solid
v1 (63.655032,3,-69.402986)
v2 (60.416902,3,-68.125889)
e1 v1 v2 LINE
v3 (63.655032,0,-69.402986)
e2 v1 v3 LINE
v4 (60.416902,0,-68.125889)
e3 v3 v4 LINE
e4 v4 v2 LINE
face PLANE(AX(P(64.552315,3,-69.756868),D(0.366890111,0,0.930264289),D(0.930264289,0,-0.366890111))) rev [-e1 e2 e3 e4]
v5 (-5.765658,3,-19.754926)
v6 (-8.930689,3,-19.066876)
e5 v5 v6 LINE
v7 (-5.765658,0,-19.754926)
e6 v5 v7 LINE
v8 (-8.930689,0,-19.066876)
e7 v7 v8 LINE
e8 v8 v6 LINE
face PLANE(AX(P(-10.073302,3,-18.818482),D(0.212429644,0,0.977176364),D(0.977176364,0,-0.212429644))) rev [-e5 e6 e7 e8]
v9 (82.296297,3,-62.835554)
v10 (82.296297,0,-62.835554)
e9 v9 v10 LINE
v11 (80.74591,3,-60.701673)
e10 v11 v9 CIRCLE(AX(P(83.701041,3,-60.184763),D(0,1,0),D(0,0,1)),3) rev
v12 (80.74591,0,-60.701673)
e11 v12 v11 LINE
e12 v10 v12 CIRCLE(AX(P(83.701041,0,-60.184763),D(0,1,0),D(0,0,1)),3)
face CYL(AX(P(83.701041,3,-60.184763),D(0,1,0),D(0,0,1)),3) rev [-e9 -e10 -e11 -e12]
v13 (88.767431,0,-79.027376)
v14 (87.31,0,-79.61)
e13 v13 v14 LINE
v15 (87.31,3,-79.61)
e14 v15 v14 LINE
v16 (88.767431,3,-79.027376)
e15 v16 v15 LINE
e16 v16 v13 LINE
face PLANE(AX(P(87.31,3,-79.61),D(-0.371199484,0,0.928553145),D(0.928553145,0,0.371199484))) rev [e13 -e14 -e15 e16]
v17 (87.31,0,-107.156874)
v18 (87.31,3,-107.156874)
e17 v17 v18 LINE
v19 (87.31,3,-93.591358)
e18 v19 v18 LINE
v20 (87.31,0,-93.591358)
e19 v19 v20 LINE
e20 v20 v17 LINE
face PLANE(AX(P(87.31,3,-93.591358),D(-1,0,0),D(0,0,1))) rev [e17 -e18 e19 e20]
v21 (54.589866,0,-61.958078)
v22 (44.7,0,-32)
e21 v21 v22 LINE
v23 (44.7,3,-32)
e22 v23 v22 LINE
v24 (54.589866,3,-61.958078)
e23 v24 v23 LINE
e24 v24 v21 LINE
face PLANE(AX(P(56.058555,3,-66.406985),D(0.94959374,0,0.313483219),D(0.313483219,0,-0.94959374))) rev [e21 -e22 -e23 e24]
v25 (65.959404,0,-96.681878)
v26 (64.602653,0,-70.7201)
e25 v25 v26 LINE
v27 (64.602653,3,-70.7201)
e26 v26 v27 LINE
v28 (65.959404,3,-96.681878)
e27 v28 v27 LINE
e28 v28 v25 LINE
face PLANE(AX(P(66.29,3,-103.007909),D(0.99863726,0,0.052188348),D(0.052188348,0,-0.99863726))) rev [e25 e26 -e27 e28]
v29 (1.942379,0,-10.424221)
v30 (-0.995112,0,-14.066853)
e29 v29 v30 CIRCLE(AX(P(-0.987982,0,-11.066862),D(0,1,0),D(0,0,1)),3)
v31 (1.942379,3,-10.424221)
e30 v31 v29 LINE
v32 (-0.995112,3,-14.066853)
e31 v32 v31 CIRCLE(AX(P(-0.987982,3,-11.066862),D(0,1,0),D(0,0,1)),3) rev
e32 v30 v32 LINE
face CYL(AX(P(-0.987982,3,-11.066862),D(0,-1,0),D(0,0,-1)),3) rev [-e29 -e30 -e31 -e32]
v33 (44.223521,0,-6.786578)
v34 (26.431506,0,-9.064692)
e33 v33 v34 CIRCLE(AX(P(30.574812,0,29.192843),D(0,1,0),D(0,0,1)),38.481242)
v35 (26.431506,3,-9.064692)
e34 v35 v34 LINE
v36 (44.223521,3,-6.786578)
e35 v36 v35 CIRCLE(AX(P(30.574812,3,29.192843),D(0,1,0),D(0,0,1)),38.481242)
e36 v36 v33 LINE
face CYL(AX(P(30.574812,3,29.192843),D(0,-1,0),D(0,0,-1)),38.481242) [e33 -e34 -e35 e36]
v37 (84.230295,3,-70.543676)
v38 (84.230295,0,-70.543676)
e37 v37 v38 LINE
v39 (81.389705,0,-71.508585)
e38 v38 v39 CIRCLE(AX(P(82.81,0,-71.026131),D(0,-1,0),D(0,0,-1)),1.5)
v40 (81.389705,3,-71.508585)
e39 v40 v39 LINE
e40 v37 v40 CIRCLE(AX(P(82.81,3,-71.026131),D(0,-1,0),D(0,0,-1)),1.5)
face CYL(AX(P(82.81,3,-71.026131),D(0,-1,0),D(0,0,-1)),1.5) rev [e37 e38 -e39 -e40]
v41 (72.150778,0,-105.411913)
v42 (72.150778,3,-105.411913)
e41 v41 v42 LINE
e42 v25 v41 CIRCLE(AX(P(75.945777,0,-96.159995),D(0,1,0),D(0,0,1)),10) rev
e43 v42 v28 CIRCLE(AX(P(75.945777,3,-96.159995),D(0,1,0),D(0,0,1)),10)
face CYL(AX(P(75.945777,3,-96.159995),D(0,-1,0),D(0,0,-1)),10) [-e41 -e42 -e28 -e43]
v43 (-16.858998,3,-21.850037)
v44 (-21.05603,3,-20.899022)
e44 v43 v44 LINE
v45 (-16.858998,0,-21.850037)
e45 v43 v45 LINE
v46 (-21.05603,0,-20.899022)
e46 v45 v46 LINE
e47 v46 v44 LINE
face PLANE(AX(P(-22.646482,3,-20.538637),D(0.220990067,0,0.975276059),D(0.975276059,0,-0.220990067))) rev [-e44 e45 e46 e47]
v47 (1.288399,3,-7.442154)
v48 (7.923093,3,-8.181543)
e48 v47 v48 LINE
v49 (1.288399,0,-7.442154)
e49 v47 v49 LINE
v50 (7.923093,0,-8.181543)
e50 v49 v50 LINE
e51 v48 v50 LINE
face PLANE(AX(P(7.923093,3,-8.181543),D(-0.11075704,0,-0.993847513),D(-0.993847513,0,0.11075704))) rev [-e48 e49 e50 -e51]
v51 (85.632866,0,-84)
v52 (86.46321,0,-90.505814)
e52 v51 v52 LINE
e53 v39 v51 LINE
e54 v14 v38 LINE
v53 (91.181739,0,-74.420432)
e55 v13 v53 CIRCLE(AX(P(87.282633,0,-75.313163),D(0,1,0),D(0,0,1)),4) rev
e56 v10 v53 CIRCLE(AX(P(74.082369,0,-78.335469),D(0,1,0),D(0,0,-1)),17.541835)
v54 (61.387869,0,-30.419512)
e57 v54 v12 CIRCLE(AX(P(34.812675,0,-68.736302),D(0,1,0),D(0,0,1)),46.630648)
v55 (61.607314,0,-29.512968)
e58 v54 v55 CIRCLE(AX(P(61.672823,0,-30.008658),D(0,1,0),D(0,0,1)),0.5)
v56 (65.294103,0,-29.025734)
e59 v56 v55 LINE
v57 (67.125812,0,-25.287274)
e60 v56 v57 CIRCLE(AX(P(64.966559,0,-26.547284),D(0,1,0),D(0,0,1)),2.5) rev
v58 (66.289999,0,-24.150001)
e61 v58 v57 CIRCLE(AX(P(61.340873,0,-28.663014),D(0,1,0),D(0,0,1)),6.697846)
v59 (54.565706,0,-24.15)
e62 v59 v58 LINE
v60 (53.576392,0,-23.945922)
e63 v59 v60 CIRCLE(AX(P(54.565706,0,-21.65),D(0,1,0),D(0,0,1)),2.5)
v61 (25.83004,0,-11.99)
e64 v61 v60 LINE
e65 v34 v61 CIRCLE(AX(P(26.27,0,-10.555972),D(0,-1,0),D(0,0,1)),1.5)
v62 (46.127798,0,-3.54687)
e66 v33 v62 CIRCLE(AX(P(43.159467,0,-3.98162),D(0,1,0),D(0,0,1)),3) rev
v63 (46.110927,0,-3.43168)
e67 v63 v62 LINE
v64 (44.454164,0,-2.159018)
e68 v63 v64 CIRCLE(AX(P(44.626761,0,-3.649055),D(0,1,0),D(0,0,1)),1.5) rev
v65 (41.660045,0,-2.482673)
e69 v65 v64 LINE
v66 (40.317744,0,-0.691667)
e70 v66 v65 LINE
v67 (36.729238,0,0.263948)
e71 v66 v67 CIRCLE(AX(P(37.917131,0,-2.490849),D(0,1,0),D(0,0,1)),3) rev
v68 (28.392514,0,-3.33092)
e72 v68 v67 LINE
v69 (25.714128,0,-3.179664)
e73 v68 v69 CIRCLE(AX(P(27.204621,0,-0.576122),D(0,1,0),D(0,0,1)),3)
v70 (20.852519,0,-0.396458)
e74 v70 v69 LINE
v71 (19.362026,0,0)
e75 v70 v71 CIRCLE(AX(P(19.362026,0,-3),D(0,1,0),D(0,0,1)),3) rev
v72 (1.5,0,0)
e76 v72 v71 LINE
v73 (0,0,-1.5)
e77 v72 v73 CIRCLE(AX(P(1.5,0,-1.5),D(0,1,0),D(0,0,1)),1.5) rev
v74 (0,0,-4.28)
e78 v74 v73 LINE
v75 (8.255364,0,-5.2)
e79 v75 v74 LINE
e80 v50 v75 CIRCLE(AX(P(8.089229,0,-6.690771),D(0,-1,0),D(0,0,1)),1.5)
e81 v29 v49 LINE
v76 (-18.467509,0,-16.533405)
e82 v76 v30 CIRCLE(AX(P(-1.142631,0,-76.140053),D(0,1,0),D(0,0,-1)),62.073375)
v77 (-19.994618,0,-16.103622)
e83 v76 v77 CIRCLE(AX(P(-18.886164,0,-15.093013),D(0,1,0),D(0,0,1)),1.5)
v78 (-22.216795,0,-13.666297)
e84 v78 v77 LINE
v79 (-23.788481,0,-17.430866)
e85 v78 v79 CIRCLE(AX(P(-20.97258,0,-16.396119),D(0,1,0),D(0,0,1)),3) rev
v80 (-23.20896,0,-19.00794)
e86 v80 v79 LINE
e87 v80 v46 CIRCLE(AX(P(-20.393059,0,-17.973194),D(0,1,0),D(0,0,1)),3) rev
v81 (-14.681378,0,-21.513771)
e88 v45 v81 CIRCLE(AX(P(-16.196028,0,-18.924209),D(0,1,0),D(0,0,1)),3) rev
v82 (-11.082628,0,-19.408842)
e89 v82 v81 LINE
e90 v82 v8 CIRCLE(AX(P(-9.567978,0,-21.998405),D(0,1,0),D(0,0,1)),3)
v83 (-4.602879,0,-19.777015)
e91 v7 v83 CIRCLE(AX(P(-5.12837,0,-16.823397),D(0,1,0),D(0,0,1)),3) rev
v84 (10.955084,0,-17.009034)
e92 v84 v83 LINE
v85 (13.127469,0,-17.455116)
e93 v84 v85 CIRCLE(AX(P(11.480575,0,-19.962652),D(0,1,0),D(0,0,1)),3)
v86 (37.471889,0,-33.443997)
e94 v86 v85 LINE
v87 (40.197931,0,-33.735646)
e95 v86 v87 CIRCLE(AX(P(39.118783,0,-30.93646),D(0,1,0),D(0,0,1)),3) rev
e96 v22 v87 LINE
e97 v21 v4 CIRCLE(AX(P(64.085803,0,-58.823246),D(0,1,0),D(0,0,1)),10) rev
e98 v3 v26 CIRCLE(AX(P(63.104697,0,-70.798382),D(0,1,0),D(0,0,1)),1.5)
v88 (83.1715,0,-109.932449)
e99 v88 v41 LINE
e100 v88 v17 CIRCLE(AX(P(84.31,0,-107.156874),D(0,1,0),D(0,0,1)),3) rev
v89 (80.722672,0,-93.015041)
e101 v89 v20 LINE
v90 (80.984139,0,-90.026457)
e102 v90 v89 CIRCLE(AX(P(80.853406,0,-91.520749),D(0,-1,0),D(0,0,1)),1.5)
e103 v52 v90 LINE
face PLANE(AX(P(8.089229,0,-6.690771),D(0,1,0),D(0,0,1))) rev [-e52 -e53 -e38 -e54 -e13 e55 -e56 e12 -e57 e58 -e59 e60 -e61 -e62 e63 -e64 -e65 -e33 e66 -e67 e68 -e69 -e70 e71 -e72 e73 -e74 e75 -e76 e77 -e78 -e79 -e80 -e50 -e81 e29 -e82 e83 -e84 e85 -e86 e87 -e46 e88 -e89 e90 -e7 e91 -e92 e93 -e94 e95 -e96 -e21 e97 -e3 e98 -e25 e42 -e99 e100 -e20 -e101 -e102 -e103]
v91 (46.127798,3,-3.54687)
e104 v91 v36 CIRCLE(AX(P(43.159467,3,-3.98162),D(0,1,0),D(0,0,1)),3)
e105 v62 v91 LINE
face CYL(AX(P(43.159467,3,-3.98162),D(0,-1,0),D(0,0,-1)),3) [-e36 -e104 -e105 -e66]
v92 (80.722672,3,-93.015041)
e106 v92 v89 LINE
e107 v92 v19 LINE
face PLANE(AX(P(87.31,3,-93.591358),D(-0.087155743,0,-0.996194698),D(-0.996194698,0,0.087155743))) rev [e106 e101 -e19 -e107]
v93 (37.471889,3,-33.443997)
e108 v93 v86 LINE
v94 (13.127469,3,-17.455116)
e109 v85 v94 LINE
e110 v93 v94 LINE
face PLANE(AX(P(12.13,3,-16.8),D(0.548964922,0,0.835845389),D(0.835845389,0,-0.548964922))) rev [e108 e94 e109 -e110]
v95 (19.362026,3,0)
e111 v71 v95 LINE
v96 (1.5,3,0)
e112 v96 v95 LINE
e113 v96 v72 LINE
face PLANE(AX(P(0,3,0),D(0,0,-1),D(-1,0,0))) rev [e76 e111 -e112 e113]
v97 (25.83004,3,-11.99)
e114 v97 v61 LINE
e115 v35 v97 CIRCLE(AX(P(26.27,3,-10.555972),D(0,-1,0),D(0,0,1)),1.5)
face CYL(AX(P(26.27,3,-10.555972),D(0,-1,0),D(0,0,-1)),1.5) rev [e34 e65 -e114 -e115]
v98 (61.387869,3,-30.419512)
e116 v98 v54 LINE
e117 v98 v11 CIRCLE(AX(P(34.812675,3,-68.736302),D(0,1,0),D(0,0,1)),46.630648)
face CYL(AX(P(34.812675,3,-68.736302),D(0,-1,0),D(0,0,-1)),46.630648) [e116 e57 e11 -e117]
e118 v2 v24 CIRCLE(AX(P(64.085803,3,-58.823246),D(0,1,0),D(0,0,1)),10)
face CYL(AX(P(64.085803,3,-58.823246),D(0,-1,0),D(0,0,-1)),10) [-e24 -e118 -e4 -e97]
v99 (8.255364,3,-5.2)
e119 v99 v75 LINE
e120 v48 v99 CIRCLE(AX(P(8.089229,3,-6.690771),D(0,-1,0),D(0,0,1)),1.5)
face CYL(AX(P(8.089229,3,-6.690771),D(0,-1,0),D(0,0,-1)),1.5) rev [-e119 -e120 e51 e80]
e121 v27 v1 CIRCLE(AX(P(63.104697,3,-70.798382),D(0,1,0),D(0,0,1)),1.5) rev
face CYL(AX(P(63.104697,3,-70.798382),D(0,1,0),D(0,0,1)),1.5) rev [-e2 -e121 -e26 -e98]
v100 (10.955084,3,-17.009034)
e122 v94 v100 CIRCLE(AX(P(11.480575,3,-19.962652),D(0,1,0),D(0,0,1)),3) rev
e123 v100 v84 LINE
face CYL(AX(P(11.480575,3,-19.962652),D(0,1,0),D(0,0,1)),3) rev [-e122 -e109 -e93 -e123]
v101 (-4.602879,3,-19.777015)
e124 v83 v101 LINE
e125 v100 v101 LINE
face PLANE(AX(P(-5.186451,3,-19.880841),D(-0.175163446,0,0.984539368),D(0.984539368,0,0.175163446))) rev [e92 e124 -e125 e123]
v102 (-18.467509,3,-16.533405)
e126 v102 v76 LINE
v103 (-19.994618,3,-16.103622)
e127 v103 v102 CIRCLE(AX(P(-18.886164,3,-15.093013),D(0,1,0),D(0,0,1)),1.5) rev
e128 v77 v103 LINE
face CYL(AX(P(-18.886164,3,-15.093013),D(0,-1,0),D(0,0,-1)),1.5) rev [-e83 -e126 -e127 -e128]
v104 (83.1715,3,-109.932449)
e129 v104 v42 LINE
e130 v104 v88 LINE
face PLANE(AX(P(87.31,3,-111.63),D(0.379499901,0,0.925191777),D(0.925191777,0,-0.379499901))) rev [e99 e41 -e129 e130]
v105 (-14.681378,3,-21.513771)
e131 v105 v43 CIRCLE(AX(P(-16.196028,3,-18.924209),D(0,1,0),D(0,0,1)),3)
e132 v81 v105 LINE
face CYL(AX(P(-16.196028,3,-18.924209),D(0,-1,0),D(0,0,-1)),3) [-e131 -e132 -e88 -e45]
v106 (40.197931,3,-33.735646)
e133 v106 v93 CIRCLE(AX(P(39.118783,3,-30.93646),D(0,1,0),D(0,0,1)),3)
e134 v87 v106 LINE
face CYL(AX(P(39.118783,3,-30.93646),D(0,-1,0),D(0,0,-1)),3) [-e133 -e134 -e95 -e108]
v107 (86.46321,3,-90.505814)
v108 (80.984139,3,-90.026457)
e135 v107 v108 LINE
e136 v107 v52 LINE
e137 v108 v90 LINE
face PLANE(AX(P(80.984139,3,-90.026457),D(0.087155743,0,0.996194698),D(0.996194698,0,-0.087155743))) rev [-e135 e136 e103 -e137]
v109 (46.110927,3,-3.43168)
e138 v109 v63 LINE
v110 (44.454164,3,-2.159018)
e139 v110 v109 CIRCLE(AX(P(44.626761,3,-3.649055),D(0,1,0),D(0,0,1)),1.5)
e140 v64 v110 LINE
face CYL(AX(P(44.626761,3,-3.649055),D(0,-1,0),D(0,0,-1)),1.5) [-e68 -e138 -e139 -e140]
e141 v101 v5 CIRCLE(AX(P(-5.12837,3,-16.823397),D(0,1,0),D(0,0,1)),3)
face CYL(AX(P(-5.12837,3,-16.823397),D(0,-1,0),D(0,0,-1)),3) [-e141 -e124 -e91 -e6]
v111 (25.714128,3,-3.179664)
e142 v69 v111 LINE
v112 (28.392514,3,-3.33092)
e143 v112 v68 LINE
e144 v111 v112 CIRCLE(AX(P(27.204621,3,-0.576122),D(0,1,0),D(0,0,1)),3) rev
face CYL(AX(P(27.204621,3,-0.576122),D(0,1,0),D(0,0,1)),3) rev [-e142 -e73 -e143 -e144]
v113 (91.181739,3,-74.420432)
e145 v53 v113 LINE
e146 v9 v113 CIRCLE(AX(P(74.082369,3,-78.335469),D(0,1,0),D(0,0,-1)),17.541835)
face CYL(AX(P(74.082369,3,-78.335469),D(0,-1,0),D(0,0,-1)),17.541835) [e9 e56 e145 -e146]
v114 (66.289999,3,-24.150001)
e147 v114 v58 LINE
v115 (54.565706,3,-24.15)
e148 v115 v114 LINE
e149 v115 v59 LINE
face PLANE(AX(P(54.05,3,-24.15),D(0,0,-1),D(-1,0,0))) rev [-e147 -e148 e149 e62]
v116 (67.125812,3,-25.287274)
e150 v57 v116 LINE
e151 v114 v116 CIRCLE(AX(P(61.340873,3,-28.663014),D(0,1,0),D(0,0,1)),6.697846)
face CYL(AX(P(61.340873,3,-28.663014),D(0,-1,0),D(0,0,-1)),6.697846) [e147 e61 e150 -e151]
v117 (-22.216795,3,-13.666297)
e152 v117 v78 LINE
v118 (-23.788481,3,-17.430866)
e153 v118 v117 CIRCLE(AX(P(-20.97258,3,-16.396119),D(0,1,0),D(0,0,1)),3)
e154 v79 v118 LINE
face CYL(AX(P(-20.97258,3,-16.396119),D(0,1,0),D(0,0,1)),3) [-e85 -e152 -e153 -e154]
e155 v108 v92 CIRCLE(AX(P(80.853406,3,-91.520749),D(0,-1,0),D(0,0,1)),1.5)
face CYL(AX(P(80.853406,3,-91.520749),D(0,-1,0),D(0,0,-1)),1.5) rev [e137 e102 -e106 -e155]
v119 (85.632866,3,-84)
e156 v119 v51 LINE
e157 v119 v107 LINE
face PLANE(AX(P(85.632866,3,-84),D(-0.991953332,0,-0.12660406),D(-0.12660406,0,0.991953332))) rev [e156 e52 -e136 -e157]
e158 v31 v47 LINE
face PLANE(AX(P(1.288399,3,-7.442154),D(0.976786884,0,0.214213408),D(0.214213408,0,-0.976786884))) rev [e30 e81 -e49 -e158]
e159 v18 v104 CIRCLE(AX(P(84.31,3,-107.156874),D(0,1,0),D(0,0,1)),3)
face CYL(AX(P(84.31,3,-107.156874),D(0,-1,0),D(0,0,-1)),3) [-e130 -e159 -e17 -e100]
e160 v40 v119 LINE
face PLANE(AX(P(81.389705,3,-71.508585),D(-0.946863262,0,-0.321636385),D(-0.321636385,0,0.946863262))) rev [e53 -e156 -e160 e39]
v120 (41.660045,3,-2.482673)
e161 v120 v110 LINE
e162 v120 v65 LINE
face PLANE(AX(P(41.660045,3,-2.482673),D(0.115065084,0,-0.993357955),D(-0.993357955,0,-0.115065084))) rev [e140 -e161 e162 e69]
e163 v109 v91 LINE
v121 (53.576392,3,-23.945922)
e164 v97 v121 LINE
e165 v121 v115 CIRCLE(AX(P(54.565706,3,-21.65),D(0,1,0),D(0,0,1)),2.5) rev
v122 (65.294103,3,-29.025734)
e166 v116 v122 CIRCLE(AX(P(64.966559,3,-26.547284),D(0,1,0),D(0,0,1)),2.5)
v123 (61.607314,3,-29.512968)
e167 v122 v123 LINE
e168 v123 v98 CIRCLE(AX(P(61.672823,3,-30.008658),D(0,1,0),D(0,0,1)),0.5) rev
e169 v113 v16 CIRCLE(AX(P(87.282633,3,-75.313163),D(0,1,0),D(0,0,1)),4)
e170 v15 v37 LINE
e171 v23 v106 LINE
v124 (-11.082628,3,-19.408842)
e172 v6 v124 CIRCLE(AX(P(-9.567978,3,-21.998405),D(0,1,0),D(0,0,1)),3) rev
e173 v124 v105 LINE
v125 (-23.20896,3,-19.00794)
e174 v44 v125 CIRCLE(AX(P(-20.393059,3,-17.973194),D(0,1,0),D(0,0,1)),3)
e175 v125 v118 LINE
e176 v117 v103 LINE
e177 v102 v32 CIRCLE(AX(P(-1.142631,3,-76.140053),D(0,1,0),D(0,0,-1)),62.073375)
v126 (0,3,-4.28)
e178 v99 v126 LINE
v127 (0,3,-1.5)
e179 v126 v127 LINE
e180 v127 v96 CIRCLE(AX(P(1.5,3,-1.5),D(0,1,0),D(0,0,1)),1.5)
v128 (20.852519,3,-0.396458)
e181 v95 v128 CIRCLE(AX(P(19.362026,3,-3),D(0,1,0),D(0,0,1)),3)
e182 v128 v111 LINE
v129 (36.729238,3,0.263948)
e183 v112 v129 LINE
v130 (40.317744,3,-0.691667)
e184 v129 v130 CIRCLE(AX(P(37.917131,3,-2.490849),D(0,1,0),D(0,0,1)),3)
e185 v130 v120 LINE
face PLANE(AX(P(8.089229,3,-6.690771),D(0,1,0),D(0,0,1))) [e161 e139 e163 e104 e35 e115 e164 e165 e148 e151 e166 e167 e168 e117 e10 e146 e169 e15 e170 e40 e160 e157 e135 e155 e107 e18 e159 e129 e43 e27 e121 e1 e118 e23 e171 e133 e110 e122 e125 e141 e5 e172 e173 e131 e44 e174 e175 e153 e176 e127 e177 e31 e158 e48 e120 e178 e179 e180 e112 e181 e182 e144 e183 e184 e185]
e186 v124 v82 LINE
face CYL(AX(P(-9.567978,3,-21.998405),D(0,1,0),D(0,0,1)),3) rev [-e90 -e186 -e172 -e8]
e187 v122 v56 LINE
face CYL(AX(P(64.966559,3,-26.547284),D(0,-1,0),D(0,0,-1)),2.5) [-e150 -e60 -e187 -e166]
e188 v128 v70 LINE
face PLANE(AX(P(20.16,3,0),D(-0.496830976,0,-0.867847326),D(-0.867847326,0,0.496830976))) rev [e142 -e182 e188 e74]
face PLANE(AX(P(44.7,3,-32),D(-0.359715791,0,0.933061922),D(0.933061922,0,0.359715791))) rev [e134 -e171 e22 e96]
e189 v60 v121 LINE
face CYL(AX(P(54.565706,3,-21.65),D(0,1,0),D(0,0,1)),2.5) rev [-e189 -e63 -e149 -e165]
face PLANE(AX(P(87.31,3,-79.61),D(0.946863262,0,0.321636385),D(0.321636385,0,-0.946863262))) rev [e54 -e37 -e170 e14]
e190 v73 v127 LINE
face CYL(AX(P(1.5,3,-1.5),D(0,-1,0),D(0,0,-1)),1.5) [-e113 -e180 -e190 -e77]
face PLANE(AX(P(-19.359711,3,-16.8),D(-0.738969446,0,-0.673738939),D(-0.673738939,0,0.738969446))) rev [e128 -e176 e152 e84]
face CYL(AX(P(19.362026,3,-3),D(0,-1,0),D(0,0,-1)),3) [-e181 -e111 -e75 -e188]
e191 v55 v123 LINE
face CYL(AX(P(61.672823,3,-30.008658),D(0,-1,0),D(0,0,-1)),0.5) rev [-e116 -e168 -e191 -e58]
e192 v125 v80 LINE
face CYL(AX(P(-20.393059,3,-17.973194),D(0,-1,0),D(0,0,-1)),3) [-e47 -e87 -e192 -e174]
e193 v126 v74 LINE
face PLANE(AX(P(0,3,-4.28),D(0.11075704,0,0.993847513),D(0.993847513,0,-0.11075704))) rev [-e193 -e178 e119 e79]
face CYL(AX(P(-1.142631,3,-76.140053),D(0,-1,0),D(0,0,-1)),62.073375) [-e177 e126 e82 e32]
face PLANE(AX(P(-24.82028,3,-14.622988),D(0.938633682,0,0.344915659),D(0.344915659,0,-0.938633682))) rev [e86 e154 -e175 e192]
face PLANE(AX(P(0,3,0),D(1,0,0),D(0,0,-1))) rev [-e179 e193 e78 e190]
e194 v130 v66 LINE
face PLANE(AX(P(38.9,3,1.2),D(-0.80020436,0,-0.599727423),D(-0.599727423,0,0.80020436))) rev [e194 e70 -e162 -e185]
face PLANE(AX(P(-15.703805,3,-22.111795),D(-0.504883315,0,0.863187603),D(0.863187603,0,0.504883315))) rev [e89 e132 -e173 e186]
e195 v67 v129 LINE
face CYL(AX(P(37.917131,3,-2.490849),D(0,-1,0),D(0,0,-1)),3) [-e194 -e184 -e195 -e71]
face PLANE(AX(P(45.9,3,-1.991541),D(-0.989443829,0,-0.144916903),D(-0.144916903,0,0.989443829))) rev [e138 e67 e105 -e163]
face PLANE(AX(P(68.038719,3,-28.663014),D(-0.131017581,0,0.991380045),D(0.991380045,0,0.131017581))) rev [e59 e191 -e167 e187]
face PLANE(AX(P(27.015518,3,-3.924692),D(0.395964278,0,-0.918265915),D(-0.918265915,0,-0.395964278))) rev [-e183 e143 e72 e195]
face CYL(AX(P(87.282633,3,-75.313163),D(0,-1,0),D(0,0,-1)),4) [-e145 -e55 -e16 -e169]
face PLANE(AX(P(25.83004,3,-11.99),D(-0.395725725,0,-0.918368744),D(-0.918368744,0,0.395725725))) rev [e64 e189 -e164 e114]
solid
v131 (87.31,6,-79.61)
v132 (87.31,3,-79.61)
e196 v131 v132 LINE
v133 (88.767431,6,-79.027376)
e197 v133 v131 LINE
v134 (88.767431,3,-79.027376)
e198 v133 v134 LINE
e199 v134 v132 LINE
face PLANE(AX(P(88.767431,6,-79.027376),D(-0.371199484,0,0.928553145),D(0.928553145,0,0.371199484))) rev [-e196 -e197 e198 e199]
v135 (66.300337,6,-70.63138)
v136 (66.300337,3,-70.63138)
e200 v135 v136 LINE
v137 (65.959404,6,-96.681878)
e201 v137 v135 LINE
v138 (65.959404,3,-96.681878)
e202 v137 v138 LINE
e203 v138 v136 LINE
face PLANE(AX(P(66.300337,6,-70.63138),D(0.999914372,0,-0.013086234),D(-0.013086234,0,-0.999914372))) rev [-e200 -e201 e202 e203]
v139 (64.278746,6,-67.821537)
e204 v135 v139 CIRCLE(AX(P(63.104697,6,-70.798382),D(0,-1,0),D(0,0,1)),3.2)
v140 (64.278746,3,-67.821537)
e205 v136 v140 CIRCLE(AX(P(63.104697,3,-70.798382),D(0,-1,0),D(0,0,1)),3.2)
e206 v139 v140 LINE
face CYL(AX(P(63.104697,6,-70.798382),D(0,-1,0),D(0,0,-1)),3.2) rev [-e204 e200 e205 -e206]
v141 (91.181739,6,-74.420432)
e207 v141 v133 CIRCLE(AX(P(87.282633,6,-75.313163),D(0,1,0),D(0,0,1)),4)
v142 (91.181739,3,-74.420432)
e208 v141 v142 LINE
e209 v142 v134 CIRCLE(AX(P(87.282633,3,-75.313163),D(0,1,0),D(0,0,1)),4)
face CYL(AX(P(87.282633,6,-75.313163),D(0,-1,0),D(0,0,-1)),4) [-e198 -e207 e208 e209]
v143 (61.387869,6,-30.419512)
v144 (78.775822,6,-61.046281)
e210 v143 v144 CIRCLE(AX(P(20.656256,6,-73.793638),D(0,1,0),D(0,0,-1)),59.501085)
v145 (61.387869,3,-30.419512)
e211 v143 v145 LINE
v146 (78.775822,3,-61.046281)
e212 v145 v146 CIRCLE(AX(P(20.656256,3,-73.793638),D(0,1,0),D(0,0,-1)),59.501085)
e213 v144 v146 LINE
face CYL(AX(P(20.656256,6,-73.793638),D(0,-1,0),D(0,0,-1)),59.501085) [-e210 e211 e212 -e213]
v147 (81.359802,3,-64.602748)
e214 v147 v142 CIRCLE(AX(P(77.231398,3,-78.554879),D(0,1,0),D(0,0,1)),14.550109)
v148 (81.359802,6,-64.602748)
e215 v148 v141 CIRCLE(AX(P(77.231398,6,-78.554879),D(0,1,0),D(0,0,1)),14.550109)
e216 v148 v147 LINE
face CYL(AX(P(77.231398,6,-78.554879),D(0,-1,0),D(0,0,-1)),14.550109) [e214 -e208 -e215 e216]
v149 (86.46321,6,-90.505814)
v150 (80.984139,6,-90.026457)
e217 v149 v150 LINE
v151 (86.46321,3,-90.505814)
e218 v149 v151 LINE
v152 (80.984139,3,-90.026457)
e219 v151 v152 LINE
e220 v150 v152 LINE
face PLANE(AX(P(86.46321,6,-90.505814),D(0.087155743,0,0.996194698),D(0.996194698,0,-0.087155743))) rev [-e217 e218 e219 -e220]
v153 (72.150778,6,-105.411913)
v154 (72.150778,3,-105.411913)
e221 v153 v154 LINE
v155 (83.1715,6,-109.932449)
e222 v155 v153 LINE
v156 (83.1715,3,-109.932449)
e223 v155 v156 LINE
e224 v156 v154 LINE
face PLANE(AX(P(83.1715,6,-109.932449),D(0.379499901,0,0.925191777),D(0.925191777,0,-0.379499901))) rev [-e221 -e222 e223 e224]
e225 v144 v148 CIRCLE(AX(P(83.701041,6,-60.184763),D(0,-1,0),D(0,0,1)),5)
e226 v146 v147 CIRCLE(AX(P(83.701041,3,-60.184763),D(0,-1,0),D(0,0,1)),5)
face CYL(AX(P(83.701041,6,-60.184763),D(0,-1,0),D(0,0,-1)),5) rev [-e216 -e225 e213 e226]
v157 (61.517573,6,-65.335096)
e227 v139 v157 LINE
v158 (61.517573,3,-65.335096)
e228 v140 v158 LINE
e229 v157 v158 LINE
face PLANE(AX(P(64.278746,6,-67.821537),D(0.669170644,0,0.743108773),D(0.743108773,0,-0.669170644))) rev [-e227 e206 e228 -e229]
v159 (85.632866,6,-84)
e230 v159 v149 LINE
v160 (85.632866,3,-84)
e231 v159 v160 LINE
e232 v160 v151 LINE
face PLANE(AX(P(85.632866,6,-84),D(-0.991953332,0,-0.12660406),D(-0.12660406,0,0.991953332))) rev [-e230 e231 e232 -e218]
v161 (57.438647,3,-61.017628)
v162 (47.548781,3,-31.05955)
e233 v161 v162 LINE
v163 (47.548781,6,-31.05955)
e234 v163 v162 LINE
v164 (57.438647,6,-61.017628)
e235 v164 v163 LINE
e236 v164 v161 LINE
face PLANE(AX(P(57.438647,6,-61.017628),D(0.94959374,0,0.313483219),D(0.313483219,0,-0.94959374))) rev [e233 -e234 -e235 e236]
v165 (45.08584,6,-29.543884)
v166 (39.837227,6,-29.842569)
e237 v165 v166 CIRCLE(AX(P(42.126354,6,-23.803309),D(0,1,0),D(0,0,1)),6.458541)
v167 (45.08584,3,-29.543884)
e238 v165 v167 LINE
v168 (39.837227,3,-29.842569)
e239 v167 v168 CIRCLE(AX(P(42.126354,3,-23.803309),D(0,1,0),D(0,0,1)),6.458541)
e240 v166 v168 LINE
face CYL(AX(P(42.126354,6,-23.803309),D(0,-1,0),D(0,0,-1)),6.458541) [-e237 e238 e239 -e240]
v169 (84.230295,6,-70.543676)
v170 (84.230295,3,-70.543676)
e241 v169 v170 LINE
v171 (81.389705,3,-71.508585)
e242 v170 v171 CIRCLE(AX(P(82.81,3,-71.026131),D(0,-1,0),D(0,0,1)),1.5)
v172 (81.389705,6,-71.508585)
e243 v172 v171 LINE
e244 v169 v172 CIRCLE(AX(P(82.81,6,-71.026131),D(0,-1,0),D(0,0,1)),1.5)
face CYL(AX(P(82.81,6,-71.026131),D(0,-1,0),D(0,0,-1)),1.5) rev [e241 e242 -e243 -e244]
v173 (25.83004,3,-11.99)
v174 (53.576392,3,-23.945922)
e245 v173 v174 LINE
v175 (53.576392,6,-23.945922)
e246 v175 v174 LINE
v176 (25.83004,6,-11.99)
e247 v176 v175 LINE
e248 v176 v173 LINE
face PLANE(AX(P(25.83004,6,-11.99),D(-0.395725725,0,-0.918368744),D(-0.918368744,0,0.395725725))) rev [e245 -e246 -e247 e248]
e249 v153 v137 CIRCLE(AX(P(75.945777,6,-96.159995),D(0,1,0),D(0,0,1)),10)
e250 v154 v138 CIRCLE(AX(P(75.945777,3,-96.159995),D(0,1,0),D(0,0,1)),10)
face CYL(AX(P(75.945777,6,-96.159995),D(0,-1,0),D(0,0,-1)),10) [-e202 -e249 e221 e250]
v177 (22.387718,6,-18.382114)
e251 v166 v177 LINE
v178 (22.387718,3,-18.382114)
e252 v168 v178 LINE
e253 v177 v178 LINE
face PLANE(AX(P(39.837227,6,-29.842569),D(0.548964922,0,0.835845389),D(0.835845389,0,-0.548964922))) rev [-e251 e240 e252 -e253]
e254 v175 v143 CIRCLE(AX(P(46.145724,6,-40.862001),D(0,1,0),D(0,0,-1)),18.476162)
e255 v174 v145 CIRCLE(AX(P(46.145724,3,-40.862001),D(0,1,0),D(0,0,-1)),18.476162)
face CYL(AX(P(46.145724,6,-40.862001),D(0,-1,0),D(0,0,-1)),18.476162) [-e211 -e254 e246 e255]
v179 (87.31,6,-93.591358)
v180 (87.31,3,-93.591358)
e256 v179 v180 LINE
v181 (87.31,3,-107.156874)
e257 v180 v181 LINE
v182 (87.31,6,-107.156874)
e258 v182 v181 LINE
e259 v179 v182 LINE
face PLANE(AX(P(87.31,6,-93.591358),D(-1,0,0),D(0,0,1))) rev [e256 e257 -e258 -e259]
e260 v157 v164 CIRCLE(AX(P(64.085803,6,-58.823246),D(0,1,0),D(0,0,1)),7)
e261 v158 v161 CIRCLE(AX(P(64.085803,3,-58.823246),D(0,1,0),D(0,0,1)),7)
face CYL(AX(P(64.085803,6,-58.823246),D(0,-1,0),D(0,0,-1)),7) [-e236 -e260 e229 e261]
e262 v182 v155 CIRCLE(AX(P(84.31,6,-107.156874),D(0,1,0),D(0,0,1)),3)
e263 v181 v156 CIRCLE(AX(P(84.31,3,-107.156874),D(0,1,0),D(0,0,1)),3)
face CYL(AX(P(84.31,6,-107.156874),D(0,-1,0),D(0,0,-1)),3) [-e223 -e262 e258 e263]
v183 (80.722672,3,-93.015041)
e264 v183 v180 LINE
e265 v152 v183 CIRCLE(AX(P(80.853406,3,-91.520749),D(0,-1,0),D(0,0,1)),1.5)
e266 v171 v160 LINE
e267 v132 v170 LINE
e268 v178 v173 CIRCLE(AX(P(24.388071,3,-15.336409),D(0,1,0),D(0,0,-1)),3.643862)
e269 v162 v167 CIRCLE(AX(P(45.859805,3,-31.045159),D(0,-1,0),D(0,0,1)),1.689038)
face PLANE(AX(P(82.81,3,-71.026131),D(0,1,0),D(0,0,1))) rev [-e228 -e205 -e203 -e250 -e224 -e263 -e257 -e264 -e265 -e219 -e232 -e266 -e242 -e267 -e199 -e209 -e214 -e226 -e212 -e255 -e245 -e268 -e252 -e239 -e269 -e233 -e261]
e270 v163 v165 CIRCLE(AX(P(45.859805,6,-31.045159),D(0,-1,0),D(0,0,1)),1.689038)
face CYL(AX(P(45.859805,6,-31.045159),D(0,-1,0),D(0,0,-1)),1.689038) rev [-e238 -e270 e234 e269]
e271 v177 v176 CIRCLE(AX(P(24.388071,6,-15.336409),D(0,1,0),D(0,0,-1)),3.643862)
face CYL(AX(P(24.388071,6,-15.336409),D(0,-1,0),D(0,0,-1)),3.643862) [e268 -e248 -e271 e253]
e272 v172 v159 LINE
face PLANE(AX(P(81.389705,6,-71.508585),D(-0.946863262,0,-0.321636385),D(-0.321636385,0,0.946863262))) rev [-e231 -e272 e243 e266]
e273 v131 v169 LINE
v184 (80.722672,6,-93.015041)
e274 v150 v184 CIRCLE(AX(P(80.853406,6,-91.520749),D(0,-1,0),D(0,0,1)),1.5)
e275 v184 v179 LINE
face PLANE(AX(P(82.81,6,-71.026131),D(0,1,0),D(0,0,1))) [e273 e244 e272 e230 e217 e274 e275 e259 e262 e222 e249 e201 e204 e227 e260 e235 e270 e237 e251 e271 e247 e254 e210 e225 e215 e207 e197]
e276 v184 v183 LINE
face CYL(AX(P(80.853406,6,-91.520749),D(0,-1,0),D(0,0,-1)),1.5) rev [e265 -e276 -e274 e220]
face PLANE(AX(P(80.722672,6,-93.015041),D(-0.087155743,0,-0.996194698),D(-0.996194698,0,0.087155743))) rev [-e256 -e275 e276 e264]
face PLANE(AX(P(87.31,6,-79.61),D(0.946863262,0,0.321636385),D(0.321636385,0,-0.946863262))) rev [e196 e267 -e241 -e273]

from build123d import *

# Parameters (mm, degrees)
BOSS_EXTRUDE1_DEPTH = 3
FILLET1_R           = 3
FILLET2_R           = 1.5
FILLET3_R           = 10
FILLET4_R           = 3
FILLET5_R           = 4
FILLET6_R           = 2.5
FILLET7_R           = 0.5
BOSS_EXTRUDE2_DEPTH = 3


with BuildPart() as part:
    # Sketch3 → Boss-Extrude1 (new body)
    with BuildSketch(Plane(origin=(0, 0, 0), x_dir=(1, 0, 0), z_dir=(0, 1, 0))):
        with BuildLine():
            Line((7.923093171, 8.181542538), (1.28839884, 7.442154357))
            Line((1.28839884, 7.442154357), (2.76822933, 14.19))
            ThreePointArc((2.76822933, 14.19), (-8.413807268, 14.494015924), (-19.359710867, 16.8))
            Line((-19.359710867, 16.8), (-22.216794933, 13.666296862))
            Line((-22.216794933, 13.666296862), (-24.820279869, 14.62298821))
            Line((-24.820279869, 14.62298821), (-22.646481841, 20.53863742))
            Line((-22.646481841, 20.53863742), (-15.703804617, 22.111794774))
            Line((-15.703804617, 22.111794774), (-10.073302156, 18.818482014))
            Line((-10.073302156, 18.818482014), (-5.186450964, 19.880840969))
            Line((-5.186450964, 19.880840969), (12.13, 16.8))
            Line((12.13, 16.8), (38.76, 34.29))
            Line((38.76, 34.29), (44.7, 32))
            Line((44.7, 32), (56.058554748, 66.4069852))
            Line((56.058554748, 66.4069852), (64.552315124, 69.756868371))
            Line((64.552315124, 69.756868371), (66.29, 103.00790875))
            Line((66.29, 103.00790875), (87.31, 111.63))
            Line((87.31, 111.63), (87.31, 93.591357519))
            Line((87.31, 93.591357519), (80.722672152, 93.01504101))
            ThreePointArc((80.722672152, 93.01504101), (79.359113719, 91.390015348), (80.984139381, 90.026456915))
            Line((80.984139381, 90.026456915), (86.46321022, 90.505813501))
            Line((86.46321022, 90.505813501), (85.632866314, 84))
            Line((85.632866314, 84), (81.389705108, 71.508585308))
            ThreePointArc((81.389705108, 71.508585308), (82.327545423, 69.605835839), (84.230294892, 70.543676154))
            Line((84.230294892, 70.543676154), (87.31, 79.61))
            Line((87.31, 79.61), (91.618486592, 77.887634392))
            ThreePointArc((91.618486592, 77.887634392), (88.600013238, 68.48894743), (80.984139381, 62.208424889))
            ThreePointArc((80.984139381, 62.208424889), (74.158506271, 43.709858628), (60.297831214, 29.686025056))
            Line((60.297831214, 29.686025056), (68.03871852, 28.66301442))
            ThreePointArc((68.03871852, 28.66301442), (67.586257486, 26.243028794), (66.29, 24.15))
            Line((66.29, 24.15), (54.05, 24.15))
            Line((54.05, 24.15), (25.830040494, 11.99))
            ThreePointArc((25.830040494, 11.99), (24.800734775, 10.253880031), (26.431506195, 9.064692331))
            ThreePointArc((26.431506195, 9.064692331), (36.664028635, 8.803570476), (46.46571567, 5.854056721))
            Line((46.46571567, 5.854056721), (45.9, 1.991540554))
            Line((45.9, 1.991540554), (41.660045255, 2.482673431))
            Line((41.660045255, 2.482673431), (38.9, -1.2))
            Line((38.9, -1.2), (27.015518097, 3.924692331))
            Line((27.015518097, 3.924692331), (20.16, 0))
            Line((20.16, 0), (0, 0))
            Line((0, 0), (0, 4.28))
            Line((0, 4.28), (8.255364291, 5.2))
            ThreePointArc((8.255364291, 5.2), (9.58, 6.856906829), (7.923093171, 8.181542538))
        make_face()
    extrude(amount=BOSS_EXTRUDE1_DEPTH)

    # Fillet1
    # the kernel refuses this fillet: 3 mm, written as the material it adds along each edge
    with BuildSketch(Plane(origin=(80.984139381, 0, -62.208424889), x_dir=(0.9022478681487618, 0, -0.4312177923289046), z_dir=(0, 1, 0))) as fillet1_piece_1:
        with BuildLine():
            CenterArc((1.578679862, -2.997421373), FILLET1_R, 92.37575888, 52.157589609)
            ThreePointArc((-0.864680258, -1.256734347), (-0.427200708, -0.631903288), (0, 0))
            ThreePointArc((0, 0), (0.72716053, -0.015077949), (1.45432106, 0))
        make_face()
    extrude(amount=3)
    with BuildSketch(Plane(origin=(27.015518097, 0, -3.924692331), x_dir=(0.9182659150547935, 0, 0.39596427774305953), z_dir=(0, 1, 0))) as fillet1_piece_2:
        with BuildLine():
            CenterArc((FILLET1_R * 0.49985366711, -FILLET1_R), FILLET1_R, 90, 53.116686758)
            Line((-FILLET1_R * 0.300005823165, -FILLET1_R * 0.399812699386), (0, 0))
            Line((0, 0), (FILLET1_R * 0.49985366711, 0))
        make_face()
    extrude(amount=3)
    with BuildSketch(Plane(origin=(12.13, 0, -16.8), x_dir=(-0.9845393680489544, 0, -0.17516344584919966), z_dir=(0, 1, 0))) as fillet1_piece_3:
        with BuildLine():
            CenterArc((FILLET1_R * 0.397788634748, -FILLET1_R), FILLET1_R, 90, 43.384200988)
            Line((-FILLET1_R * 0.289098500769, -FILLET1_R * 0.273235895863), (0, 0))
            Line((0, 0), (FILLET1_R * 0.397788634748, 0))
        make_face()
    extrude(amount=3)
    with BuildSketch(Plane(origin=(-10.073302156, 0, -18.818482014), x_dir=(-0.863187603129405, 0, -0.5048833150379528), z_dir=(0, 1, 0))) as fillet1_piece_4:
        with BuildLine():
            CenterArc((FILLET1_R * 0.389766900576, -FILLET1_R), FILLET1_R, 90, 42.58838059)
            Line((-FILLET1_R * 0.286959776942, -FILLET1_R * 0.263765659633), (0, 0))
            Line((0, 0), (FILLET1_R * 0.389766900576, 0))
        make_face()
    extrude(amount=3)
    with BuildSketch(Plane(origin=(2.76822933, 0, -14.19), x_dir=(-0.21421340809022724, 0, 0.9767868835085624), z_dir=(0, 1, 0))) as fillet1_piece_5:
        with BuildLine():
            CenterArc((3.855271405, -3), FILLET1_R, 90, 102.505548925)
            ThreePointArc((0.926446282, -3.649602493), (0.490902504, -1.81777488), (0, 0))
            Line((0, 0), (3.855271405, 0))
        make_face()
    extrude(amount=3)
    # the kernel refuses this fillet: 3 mm, written as the material it takes off along each edge
    with BuildSketch(Plane(origin=(-24.820279869, -7.478630688, -14.62298821), x_dir=(0.9386336815677853, 0, 0.3449156590044952), z_dir=(0, 1, 0))) as fillet1_2_piece_1:
        with BuildLine():
            CenterArc((3, 2.991452275), FILLET1_R, 180, 85.673811508)
            Line((0, 2.991452275), (0, 0))
            Line((0, 0), (2.773696477, 0))
        make_face()
    extrude(amount=17.957261376, mode=Mode.SUBTRACT)
    with BuildSketch(Plane(origin=(20.16, -1.994934097, 0), x_dir=(0.8678473261649016, 0, -0.4968309757537575), z_dir=(0, 1, 0))) as fillet1_2_piece_2:
        with BuildLine():
            CenterArc((FILLET1_R * 0.265991212876, FILLET1_R), FILLET1_R, 240.209440415, 29.790559585)
            Line((-FILLET1_R * 0.230839762878, FILLET1_R * 0.132152673835), (0, 0))
            Line((0, 0), (FILLET1_R * 0.265991212876, 0))
        make_face()
    extrude(amount=6.989868193, mode=Mode.SUBTRACT)
    with BuildSketch(Plane(origin=(46.46571567, -6.070952348, -5.854056721), x_dir=(-0.9233291277987619, 0, -0.38400953342121286), z_dir=(0, 1, 0))) as fillet1_2_piece_3:
        with BuildLine():
            CenterArc((2.333722575, 2.99850626), FILLET1_R, 194.249797413, 77.558344276)
            Line((-0.573972765, 2.260056662), (0, 0))
            ThreePointArc((0, 0), (1.21419047, -0.019160317), (2.428380939, 0))
        make_face()
    extrude(amount=15.141904695, mode=Mode.SUBTRACT)
    with BuildSketch(Plane(origin=(38.9, -5.909950036, 1.2), x_dir=(0.5997274231965581, 0, -0.8002043600643629), z_dir=(0, 1, 0))) as fillet1_2_piece_4:
        with BuildLine():
            CenterArc((FILLET1_R * 0.78799333809, FILLET1_R), FILLET1_R, 193.524251091, 76.475748909)
            Line((-FILLET1_R * 0.184277686804, FILLET1_R * 0.766143090435), (0, 0))
            Line((0, 0), (FILLET1_R * 0.78799333809, 0))
        make_face()
    extrude(amount=14.819900071, mode=Mode.SUBTRACT)
    with BuildSketch(Plane(origin=(38.76, -3.852720436, -34.29), x_dir=(-0.8358453893738872, 0, 0.5489649215226915), z_dir=(0, 1, 0))) as fillet1_2_piece_5:
        with BuildLine():
            CenterArc((FILLET1_R * 0.513696058133, FILLET1_R), FILLET1_R, 215.621225969, 54.378774031)
            Line((-FILLET1_R * 0.299188992069, FILLET1_R * 0.417575846005), (0, 0))
            Line((0, 0), (FILLET1_R * 0.513696058133, 0))
        make_face()
    extrude(amount=10.705440872, mode=Mode.SUBTRACT)
    with BuildSketch(Plane(origin=(-5.186450964, -1.481839662, -19.880840969), x_dir=(-0.9771763639228005, 0, 0.2124296443310458), z_dir=(0, 1, 0))) as fillet1_2_piece_6:
        with BuildLine():
            CenterArc((FILLET1_R * 0.197578621542, FILLET1_R), FILLET1_R, 247.647056489, 22.352943511)
            Line((-FILLET1_R * 0.18273230535, FILLET1_R * 0.0751413086926), (0, 0))
            Line((0, 0), (FILLET1_R * 0.197578621542, 0))
        make_face()
    extrude(amount=5.963679323, mode=Mode.SUBTRACT)
    with BuildSketch(Plane(origin=(-15.703804617, -2.961195523, -22.111794774), x_dir=(-0.975276058531981, 0, 0.22099006686800218), z_dir=(0, 1, 0))) as fillet1_2_piece_7:
        with BuildLine():
            CenterArc((FILLET1_R * 0.394826069747, FILLET1_R), FILLET1_R, 226.909202107, 43.090797893)
            Line((-FILLET1_R * 0.288330425897, FILLET1_R * 0.269727994197), (0, 0))
            Line((0, 0), (FILLET1_R * 0.394826069747, 0))
        make_face()
    extrude(amount=8.922391046, mode=Mode.SUBTRACT)
    with BuildSketch(Plane(origin=(-22.646481841, -4.076928403, -20.53863742), x_dir=(-0.3449156590044966, 0, 0.9386336815677849), z_dir=(0, 1, 0))) as fillet1_2_piece_8:
        with BuildLine():
            CenterArc((FILLET1_R * 0.543590453695, FILLET1_R), FILLET1_R, 212.943838396, 57.056161604)
            Line((-FILLET1_R * 0.295613569123, FILLET1_R * 0.456183295506), (0, 0))
            Line((0, 0), (FILLET1_R * 0.543590453695, 0))
        make_face()
    extrude(amount=11.153856805, mode=Mode.SUBTRACT)

    # Fillet2
    fillet2_edges = [part.edges().sort_by_distance(p)[0] for p in [
        (-19.359710867, 1.5, -16.8),
        (64.552315124, 1.5, -69.756868371),
        (45.9, 1.5, -1.991540554),
        (0, 1.5, 0),
    ]]
    fillet(fillet2_edges, radius=FILLET2_R)

    # Fillet3
    fillet3_edges = [part.edges().sort_by_distance(p)[0] for p in [
        (56.058554748, 1.5, -66.4069852),
        (66.29, 1.5, -103.00790875),
    ]]
    fillet(fillet3_edges, radius=FILLET3_R)

    # Fillet4
    fillet4_edges = [part.edges().sort_by_distance(p)[0] for p in [
        (87.31, 1.5, -111.63),
    ]]
    fillet(fillet4_edges, radius=FILLET4_R)

    # Fillet5
    fillet5_edges = [part.edges().sort_by_distance(p)[0] for p in [
        (91.618486592, 1.5, -77.887634392),
    ]]
    fillet(fillet5_edges, radius=FILLET5_R)

    # Fillet6
    fillet6_edges = [part.edges().sort_by_distance(p)[0] for p in [
        (68.03871852, 1.5, -28.66301442),
        (54.05, 1.5, -24.15),
    ]]
    fillet(fillet6_edges, radius=FILLET6_R)

    # Fillet7
    fillet7_edges = [part.edges().sort_by_distance(p)[0] for p in [
        (60.297831214, 1.5, -29.686025056),
    ]]
    fillet(fillet7_edges, radius=FILLET7_R)


with BuildPart() as body_2:
    # Sketch5 → Boss-Extrude2 (new body)
    with BuildSketch(Plane(origin=(0, 3, 0), x_dir=(1, 0, 0), z_dir=(0, 1, 0))):
        with BuildLine():
            Line((57.438647119, 61.017628386), (47.54878122, 31.059550342))
            ThreePointArc((47.54878122, 31.059550342), (46.745029323, 29.606678601), (45.085839693, 29.543883859))
            ThreePointArc((45.085839693, 29.543883859), (42.493298813, 30.251417888), (39.83722748, 29.84256866))
            Line((39.83722748, 29.84256866), (22.387718393, 18.382113763))
            ThreePointArc((22.387718393, 18.382113763), (21.1798426, 13.608693174), (25.830040494, 11.99))
            Line((25.830040494, 11.99), (53.576391709, 23.945921861))
            ThreePointArc((53.576391709, 23.945921861), (57.935166345, 26.636052739), (61.387868939, 30.41951217))
            ThreePointArc((61.387868939, 30.41951217), (72.399744721, 44.416938985), (78.775821887, 61.046280693))
            ThreePointArc((78.775821887, 61.046280693), (79.655985981, 63.123729699), (81.35980153, 64.602748217))
            ThreePointArc((81.35980153, 64.602748217), (87.51765004, 68.264170017), (91.181739197, 74.42043175))
            ThreePointArc((91.181739197, 74.42043175), (90.825596234, 77.169883499), (88.767430757, 79.027375787))
            Line((88.767430757, 79.027375787), (87.31, 79.61))
            Line((87.31, 79.61), (84.230294892, 70.543676154))
            ThreePointArc((84.230294892, 70.543676154), (82.327545423, 69.605835839), (81.389705108, 71.508585308))
            Line((81.389705108, 71.508585308), (85.632866314, 84))
            Line((85.632866314, 84), (86.46321022, 90.505813501))
            Line((86.46321022, 90.505813501), (80.984139381, 90.026456915))
            ThreePointArc((80.984139381, 90.026456915), (79.359113719, 91.390015348), (80.722672152, 93.01504101))
            Line((80.722672152, 93.01504101), (87.31, 93.591357519))
            Line((87.31, 93.591357519), (87.31, 107.156873665))
            ThreePointArc((87.31, 107.156873665), (85.981002826, 109.648409247), (83.171500296, 109.932448997))
            Line((83.171500296, 109.932448997), (72.150777993, 105.411912682))
            ThreePointArc((72.150777993, 105.411912682), (67.78888265, 101.944895464), (65.959404411, 96.681878387))
            Line((65.959404411, 96.681878387), (66.300336526, 70.631379716))
            ThreePointArc((66.300336526, 70.631379716), (65.702262854, 68.929518291), (64.278745649, 67.821536706))
            Line((64.278745649, 67.821536706), (61.517572524, 65.335095872))
            ThreePointArc((61.517572524, 65.335095872), (58.997486234, 63.630431041), (57.438647119, 61.017628386))
        make_face()
    extrude(amount=BOSS_EXTRUDE2_DEPTH)


solid = Compound([part.part, body_2.part])
